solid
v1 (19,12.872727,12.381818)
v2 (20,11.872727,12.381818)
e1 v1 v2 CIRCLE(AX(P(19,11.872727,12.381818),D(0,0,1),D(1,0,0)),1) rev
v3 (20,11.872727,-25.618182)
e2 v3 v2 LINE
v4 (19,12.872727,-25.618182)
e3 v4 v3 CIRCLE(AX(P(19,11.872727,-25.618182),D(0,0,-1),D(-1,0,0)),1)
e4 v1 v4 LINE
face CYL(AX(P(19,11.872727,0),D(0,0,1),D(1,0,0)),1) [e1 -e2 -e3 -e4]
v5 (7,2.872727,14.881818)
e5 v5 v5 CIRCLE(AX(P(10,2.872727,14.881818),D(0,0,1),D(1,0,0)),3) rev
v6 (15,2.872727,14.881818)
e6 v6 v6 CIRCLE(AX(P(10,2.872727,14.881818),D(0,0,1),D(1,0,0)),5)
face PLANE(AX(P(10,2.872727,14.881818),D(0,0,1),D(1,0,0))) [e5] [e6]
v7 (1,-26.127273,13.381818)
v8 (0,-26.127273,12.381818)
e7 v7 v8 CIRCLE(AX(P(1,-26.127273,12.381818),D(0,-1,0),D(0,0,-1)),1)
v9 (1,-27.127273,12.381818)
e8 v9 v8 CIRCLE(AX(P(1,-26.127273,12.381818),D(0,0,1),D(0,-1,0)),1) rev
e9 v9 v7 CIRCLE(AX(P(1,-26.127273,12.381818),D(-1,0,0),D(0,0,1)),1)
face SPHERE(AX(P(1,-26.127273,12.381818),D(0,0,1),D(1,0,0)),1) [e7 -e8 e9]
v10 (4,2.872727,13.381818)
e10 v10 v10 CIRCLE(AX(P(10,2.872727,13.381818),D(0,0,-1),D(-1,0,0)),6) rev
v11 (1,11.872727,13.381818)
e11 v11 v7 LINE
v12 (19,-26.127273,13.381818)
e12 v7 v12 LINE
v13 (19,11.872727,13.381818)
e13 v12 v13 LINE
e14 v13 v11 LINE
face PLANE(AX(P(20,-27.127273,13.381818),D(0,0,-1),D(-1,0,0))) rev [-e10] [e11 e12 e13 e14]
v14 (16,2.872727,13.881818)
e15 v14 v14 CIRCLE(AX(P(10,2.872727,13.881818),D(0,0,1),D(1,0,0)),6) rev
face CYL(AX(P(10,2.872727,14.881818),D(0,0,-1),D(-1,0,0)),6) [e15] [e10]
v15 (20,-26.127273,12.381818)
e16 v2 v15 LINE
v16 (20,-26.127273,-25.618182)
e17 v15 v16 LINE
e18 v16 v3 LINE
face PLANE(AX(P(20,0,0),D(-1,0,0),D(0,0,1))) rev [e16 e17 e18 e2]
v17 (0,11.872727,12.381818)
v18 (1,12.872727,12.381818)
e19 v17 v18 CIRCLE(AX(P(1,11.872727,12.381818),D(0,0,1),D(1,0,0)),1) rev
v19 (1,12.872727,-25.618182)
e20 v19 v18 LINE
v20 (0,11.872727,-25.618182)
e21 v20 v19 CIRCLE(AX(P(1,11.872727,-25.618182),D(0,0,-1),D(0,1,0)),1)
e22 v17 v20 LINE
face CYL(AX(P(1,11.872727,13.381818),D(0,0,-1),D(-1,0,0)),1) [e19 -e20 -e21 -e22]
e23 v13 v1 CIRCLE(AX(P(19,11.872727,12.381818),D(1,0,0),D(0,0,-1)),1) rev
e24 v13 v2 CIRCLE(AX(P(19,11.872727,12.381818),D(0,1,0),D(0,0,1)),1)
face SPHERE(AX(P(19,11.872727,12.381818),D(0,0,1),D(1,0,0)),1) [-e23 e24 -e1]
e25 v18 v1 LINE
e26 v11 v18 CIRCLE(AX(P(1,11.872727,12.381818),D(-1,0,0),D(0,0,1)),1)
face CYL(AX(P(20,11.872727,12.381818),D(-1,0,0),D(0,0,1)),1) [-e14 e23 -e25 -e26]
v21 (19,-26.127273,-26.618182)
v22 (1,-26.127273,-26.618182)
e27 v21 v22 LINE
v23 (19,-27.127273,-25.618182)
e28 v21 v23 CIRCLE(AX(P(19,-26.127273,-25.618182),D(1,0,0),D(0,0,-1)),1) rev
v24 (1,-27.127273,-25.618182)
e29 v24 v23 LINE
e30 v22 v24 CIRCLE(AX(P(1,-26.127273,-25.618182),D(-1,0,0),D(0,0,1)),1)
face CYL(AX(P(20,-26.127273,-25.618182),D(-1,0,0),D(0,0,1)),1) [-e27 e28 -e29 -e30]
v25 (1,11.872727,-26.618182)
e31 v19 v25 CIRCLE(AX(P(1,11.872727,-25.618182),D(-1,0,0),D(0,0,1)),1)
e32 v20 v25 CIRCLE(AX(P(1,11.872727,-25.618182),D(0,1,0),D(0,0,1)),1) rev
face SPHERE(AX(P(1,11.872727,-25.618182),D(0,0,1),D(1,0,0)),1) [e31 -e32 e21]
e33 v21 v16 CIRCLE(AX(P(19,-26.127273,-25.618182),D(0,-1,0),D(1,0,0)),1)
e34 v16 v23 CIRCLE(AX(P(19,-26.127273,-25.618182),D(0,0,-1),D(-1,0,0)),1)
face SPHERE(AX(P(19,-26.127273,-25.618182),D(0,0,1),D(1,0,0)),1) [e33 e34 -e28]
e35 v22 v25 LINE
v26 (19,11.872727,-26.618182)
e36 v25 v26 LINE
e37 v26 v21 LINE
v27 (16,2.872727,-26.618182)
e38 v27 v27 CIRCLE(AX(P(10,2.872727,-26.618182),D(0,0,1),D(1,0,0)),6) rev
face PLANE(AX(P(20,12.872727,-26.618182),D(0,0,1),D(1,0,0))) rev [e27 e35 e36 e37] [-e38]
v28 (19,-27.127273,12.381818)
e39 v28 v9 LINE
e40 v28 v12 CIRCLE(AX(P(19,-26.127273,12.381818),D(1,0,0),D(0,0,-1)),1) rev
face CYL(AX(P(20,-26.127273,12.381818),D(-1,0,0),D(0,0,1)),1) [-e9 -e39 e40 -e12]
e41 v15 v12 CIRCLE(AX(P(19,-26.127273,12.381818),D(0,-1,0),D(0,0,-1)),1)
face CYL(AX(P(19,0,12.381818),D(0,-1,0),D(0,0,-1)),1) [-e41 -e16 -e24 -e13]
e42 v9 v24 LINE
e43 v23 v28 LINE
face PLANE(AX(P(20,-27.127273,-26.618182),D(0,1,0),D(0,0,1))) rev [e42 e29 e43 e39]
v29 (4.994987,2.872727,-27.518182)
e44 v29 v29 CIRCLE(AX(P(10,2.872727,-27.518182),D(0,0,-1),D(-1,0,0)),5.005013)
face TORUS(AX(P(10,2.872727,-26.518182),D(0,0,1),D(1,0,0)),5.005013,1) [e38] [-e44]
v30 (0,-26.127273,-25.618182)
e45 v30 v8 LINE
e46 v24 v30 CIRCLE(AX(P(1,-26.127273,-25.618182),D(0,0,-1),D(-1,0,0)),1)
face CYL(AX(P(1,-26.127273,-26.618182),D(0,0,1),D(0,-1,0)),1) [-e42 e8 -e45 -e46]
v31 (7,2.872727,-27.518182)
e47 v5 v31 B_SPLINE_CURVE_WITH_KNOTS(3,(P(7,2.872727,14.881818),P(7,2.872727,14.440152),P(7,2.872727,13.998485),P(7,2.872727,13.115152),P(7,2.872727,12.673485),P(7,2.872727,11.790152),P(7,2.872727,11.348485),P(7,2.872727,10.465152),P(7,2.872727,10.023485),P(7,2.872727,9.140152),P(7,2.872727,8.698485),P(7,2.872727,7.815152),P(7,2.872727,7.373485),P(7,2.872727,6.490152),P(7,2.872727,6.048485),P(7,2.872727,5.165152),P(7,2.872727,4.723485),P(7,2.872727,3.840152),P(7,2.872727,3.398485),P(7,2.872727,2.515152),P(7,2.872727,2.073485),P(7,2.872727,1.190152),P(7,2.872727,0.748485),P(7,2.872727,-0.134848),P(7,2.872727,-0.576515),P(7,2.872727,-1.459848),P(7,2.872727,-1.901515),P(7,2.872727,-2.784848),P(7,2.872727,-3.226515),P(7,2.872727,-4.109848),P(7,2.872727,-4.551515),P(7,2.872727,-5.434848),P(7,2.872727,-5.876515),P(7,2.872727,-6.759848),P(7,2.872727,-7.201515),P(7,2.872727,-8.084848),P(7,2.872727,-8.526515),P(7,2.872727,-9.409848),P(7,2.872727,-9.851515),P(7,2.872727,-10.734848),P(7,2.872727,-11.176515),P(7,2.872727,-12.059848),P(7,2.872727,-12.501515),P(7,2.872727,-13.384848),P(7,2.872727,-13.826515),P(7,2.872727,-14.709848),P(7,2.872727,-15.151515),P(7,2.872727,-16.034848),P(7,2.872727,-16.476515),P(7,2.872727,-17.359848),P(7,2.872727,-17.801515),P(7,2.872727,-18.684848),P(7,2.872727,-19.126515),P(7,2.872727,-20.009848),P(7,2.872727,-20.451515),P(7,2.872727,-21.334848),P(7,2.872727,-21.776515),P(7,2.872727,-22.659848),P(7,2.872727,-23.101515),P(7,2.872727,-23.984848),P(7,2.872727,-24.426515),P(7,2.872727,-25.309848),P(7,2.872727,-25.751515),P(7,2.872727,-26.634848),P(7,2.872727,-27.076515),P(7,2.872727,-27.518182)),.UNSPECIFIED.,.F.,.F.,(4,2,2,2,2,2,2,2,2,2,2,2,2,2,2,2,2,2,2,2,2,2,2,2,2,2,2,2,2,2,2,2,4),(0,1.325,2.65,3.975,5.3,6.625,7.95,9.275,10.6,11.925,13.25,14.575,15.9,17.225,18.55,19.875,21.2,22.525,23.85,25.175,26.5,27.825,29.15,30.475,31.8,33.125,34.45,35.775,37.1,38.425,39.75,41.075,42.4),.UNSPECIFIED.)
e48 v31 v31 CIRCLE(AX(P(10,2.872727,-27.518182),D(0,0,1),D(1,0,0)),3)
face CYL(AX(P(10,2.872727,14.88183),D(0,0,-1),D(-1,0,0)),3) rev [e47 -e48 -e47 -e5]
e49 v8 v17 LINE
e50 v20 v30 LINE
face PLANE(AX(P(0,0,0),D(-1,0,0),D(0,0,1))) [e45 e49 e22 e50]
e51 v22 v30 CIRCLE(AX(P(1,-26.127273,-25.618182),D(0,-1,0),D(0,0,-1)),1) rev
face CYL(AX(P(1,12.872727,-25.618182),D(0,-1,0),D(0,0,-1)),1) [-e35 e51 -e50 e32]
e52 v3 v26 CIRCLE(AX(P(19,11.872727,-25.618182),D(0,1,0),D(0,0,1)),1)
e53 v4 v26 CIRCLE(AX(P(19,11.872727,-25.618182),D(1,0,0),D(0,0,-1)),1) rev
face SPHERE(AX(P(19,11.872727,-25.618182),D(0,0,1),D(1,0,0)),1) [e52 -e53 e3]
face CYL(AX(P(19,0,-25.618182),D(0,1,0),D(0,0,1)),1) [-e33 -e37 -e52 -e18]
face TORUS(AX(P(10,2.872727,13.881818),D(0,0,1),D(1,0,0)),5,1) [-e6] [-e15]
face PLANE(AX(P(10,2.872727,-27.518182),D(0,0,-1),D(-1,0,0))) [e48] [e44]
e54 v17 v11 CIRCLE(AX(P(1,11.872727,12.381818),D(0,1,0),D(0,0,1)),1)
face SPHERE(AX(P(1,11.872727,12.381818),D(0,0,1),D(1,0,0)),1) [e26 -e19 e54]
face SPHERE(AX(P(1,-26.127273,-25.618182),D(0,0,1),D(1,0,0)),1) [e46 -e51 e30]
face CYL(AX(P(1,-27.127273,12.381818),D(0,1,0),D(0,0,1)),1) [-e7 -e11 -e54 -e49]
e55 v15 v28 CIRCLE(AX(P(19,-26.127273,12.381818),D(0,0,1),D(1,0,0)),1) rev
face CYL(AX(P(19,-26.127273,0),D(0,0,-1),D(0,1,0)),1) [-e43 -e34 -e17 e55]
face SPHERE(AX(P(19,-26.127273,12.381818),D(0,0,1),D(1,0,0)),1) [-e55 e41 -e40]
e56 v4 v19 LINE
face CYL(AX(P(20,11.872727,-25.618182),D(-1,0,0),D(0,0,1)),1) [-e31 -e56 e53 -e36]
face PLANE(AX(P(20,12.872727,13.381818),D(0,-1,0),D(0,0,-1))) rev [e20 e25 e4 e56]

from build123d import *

# Parameters (mm, degrees)
SKETCH1_W               = 40
SKETCH1_H               = 40
BOSS_EXTRUDE1_DEPTH     = 20
FILLET1_R               = 1
SKETCH2_R               = 6
BOSS_EXTRUDE2_DEPTH     = 1.5
FILLET2_R               = 1
BOSS_EXTRUDE4_START     = 0.9
SKETCH4_R               = 6
BOSS_EXTRUDE4_DEPTH     = 0.9
FILLET3_R               = 1
CUT_EXTRUDE2_DEPTH      = 55.163169457
CUT_EXTRUDE2_DEPTH_BACK = 55.163169457
SKETCH3_R               = 3


with BuildPart() as part:
    # Sketch1 → Boss-Extrude1 (new body)
    with BuildSketch(Plane(origin=(0, 0, 0), x_dir=(0, 0, -1), z_dir=(1, 0, 0))):
        with Locations((6.618181818, -7.127272727)):
            Rectangle(SKETCH1_W, SKETCH1_H)
    extrude(amount=BOSS_EXTRUDE1_DEPTH)

    # Fillet1
    fillet1_edges = [part.edges().sort_by_distance(p)[0] for p in [
        (20, -7.127272727, -26.618181818),
        (20, 12.872727273, -6.618181818),
        (20, -7.127272727, 13.381818182),
        (0, 12.872727273, -6.618181818),
        (0, -7.127272727, -26.618181818),
        (0, -27.127272727, -6.618181818),
        (0, -7.127272727, 13.381818182),
        (20, -27.127272727, -6.618181818),
        (10, 12.872727273, 13.381818182),
        (10, 12.872727273, -26.618181818),
        (10, -27.127272727, -26.618181818),
        (10, -27.127272727, 13.381818182),
    ]]
    fillet(fillet1_edges, radius=FILLET1_R)

    # Sketch2 → Boss-Extrude2 (add)
    with BuildSketch(Plane.XY.offset(13.381818182)):
        with Locations(Location((10, 2.872727273, 0), (0, 0, 180))):
            Circle(SKETCH2_R)
    extrude(amount=BOSS_EXTRUDE2_DEPTH)

    # Fillet2
    fillet2_edges = [part.edges().sort_by_distance(p)[0] for p in [
        (16, 2.872727273, 14.881818182),
    ]]
    fillet(fillet2_edges, radius=FILLET2_R)

    # Sketch4 → Boss-Extrude4 (add)
    with BuildSketch(Plane(origin=(0, 0, -26.618181818), x_dir=(-1, 0, 0), z_dir=(0, 0, -1)).offset(BOSS_EXTRUDE4_START)):
        with Locations((-10, 2.872727273)):
            Circle(SKETCH4_R)
    extrude(amount=-BOSS_EXTRUDE4_DEPTH)

    # Fillet3
    # the kernel refuses this fillet: 1 mm, written as the material it takes off along each edge
    with BuildSketch(Plane(origin=(10, 2.872727273, -27.518181818), x_dir=(-1, 0, 0), z_dir=(0, -1, 0))) as fillet3_piece_1:
        with BuildLine():
            CenterArc((5.005012563, -1), FILLET3_R, 5.739170477, 84.260829523)
            Line((5.005012563, 0), (5.005012563, 0.02))
            Line((5.005012563, 0.02), (6, 0.02))
            Line((6, 0.02), (6.02, 0))
            ThreePointArc((6.02, 0), (6.02, -0.45), (6.019899749, -0.898))
            Line((6.019899749, -0.898), (6, -0.9))
        make_face()
    revolve(axis=Axis((10, 2.872727273, -27.518181818), (0, 0, -1)), mode=Mode.SUBTRACT)

    # Sketch3 → Cut-Extrude2 (cut, two sides: drawn at the far end of the back side and taken through both)
    with BuildSketch(Plane.XY.offset(14.881818182).offset(-CUT_EXTRUDE2_DEPTH_BACK)):
        with Locations(Location((10, 2.872727273, 0), (0, 0, 180))):
            Circle(SKETCH3_R)
    extrude(amount=CUT_EXTRUDE2_DEPTH + CUT_EXTRUDE2_DEPTH_BACK, mode=Mode.SUBTRACT)


solid = part.part
